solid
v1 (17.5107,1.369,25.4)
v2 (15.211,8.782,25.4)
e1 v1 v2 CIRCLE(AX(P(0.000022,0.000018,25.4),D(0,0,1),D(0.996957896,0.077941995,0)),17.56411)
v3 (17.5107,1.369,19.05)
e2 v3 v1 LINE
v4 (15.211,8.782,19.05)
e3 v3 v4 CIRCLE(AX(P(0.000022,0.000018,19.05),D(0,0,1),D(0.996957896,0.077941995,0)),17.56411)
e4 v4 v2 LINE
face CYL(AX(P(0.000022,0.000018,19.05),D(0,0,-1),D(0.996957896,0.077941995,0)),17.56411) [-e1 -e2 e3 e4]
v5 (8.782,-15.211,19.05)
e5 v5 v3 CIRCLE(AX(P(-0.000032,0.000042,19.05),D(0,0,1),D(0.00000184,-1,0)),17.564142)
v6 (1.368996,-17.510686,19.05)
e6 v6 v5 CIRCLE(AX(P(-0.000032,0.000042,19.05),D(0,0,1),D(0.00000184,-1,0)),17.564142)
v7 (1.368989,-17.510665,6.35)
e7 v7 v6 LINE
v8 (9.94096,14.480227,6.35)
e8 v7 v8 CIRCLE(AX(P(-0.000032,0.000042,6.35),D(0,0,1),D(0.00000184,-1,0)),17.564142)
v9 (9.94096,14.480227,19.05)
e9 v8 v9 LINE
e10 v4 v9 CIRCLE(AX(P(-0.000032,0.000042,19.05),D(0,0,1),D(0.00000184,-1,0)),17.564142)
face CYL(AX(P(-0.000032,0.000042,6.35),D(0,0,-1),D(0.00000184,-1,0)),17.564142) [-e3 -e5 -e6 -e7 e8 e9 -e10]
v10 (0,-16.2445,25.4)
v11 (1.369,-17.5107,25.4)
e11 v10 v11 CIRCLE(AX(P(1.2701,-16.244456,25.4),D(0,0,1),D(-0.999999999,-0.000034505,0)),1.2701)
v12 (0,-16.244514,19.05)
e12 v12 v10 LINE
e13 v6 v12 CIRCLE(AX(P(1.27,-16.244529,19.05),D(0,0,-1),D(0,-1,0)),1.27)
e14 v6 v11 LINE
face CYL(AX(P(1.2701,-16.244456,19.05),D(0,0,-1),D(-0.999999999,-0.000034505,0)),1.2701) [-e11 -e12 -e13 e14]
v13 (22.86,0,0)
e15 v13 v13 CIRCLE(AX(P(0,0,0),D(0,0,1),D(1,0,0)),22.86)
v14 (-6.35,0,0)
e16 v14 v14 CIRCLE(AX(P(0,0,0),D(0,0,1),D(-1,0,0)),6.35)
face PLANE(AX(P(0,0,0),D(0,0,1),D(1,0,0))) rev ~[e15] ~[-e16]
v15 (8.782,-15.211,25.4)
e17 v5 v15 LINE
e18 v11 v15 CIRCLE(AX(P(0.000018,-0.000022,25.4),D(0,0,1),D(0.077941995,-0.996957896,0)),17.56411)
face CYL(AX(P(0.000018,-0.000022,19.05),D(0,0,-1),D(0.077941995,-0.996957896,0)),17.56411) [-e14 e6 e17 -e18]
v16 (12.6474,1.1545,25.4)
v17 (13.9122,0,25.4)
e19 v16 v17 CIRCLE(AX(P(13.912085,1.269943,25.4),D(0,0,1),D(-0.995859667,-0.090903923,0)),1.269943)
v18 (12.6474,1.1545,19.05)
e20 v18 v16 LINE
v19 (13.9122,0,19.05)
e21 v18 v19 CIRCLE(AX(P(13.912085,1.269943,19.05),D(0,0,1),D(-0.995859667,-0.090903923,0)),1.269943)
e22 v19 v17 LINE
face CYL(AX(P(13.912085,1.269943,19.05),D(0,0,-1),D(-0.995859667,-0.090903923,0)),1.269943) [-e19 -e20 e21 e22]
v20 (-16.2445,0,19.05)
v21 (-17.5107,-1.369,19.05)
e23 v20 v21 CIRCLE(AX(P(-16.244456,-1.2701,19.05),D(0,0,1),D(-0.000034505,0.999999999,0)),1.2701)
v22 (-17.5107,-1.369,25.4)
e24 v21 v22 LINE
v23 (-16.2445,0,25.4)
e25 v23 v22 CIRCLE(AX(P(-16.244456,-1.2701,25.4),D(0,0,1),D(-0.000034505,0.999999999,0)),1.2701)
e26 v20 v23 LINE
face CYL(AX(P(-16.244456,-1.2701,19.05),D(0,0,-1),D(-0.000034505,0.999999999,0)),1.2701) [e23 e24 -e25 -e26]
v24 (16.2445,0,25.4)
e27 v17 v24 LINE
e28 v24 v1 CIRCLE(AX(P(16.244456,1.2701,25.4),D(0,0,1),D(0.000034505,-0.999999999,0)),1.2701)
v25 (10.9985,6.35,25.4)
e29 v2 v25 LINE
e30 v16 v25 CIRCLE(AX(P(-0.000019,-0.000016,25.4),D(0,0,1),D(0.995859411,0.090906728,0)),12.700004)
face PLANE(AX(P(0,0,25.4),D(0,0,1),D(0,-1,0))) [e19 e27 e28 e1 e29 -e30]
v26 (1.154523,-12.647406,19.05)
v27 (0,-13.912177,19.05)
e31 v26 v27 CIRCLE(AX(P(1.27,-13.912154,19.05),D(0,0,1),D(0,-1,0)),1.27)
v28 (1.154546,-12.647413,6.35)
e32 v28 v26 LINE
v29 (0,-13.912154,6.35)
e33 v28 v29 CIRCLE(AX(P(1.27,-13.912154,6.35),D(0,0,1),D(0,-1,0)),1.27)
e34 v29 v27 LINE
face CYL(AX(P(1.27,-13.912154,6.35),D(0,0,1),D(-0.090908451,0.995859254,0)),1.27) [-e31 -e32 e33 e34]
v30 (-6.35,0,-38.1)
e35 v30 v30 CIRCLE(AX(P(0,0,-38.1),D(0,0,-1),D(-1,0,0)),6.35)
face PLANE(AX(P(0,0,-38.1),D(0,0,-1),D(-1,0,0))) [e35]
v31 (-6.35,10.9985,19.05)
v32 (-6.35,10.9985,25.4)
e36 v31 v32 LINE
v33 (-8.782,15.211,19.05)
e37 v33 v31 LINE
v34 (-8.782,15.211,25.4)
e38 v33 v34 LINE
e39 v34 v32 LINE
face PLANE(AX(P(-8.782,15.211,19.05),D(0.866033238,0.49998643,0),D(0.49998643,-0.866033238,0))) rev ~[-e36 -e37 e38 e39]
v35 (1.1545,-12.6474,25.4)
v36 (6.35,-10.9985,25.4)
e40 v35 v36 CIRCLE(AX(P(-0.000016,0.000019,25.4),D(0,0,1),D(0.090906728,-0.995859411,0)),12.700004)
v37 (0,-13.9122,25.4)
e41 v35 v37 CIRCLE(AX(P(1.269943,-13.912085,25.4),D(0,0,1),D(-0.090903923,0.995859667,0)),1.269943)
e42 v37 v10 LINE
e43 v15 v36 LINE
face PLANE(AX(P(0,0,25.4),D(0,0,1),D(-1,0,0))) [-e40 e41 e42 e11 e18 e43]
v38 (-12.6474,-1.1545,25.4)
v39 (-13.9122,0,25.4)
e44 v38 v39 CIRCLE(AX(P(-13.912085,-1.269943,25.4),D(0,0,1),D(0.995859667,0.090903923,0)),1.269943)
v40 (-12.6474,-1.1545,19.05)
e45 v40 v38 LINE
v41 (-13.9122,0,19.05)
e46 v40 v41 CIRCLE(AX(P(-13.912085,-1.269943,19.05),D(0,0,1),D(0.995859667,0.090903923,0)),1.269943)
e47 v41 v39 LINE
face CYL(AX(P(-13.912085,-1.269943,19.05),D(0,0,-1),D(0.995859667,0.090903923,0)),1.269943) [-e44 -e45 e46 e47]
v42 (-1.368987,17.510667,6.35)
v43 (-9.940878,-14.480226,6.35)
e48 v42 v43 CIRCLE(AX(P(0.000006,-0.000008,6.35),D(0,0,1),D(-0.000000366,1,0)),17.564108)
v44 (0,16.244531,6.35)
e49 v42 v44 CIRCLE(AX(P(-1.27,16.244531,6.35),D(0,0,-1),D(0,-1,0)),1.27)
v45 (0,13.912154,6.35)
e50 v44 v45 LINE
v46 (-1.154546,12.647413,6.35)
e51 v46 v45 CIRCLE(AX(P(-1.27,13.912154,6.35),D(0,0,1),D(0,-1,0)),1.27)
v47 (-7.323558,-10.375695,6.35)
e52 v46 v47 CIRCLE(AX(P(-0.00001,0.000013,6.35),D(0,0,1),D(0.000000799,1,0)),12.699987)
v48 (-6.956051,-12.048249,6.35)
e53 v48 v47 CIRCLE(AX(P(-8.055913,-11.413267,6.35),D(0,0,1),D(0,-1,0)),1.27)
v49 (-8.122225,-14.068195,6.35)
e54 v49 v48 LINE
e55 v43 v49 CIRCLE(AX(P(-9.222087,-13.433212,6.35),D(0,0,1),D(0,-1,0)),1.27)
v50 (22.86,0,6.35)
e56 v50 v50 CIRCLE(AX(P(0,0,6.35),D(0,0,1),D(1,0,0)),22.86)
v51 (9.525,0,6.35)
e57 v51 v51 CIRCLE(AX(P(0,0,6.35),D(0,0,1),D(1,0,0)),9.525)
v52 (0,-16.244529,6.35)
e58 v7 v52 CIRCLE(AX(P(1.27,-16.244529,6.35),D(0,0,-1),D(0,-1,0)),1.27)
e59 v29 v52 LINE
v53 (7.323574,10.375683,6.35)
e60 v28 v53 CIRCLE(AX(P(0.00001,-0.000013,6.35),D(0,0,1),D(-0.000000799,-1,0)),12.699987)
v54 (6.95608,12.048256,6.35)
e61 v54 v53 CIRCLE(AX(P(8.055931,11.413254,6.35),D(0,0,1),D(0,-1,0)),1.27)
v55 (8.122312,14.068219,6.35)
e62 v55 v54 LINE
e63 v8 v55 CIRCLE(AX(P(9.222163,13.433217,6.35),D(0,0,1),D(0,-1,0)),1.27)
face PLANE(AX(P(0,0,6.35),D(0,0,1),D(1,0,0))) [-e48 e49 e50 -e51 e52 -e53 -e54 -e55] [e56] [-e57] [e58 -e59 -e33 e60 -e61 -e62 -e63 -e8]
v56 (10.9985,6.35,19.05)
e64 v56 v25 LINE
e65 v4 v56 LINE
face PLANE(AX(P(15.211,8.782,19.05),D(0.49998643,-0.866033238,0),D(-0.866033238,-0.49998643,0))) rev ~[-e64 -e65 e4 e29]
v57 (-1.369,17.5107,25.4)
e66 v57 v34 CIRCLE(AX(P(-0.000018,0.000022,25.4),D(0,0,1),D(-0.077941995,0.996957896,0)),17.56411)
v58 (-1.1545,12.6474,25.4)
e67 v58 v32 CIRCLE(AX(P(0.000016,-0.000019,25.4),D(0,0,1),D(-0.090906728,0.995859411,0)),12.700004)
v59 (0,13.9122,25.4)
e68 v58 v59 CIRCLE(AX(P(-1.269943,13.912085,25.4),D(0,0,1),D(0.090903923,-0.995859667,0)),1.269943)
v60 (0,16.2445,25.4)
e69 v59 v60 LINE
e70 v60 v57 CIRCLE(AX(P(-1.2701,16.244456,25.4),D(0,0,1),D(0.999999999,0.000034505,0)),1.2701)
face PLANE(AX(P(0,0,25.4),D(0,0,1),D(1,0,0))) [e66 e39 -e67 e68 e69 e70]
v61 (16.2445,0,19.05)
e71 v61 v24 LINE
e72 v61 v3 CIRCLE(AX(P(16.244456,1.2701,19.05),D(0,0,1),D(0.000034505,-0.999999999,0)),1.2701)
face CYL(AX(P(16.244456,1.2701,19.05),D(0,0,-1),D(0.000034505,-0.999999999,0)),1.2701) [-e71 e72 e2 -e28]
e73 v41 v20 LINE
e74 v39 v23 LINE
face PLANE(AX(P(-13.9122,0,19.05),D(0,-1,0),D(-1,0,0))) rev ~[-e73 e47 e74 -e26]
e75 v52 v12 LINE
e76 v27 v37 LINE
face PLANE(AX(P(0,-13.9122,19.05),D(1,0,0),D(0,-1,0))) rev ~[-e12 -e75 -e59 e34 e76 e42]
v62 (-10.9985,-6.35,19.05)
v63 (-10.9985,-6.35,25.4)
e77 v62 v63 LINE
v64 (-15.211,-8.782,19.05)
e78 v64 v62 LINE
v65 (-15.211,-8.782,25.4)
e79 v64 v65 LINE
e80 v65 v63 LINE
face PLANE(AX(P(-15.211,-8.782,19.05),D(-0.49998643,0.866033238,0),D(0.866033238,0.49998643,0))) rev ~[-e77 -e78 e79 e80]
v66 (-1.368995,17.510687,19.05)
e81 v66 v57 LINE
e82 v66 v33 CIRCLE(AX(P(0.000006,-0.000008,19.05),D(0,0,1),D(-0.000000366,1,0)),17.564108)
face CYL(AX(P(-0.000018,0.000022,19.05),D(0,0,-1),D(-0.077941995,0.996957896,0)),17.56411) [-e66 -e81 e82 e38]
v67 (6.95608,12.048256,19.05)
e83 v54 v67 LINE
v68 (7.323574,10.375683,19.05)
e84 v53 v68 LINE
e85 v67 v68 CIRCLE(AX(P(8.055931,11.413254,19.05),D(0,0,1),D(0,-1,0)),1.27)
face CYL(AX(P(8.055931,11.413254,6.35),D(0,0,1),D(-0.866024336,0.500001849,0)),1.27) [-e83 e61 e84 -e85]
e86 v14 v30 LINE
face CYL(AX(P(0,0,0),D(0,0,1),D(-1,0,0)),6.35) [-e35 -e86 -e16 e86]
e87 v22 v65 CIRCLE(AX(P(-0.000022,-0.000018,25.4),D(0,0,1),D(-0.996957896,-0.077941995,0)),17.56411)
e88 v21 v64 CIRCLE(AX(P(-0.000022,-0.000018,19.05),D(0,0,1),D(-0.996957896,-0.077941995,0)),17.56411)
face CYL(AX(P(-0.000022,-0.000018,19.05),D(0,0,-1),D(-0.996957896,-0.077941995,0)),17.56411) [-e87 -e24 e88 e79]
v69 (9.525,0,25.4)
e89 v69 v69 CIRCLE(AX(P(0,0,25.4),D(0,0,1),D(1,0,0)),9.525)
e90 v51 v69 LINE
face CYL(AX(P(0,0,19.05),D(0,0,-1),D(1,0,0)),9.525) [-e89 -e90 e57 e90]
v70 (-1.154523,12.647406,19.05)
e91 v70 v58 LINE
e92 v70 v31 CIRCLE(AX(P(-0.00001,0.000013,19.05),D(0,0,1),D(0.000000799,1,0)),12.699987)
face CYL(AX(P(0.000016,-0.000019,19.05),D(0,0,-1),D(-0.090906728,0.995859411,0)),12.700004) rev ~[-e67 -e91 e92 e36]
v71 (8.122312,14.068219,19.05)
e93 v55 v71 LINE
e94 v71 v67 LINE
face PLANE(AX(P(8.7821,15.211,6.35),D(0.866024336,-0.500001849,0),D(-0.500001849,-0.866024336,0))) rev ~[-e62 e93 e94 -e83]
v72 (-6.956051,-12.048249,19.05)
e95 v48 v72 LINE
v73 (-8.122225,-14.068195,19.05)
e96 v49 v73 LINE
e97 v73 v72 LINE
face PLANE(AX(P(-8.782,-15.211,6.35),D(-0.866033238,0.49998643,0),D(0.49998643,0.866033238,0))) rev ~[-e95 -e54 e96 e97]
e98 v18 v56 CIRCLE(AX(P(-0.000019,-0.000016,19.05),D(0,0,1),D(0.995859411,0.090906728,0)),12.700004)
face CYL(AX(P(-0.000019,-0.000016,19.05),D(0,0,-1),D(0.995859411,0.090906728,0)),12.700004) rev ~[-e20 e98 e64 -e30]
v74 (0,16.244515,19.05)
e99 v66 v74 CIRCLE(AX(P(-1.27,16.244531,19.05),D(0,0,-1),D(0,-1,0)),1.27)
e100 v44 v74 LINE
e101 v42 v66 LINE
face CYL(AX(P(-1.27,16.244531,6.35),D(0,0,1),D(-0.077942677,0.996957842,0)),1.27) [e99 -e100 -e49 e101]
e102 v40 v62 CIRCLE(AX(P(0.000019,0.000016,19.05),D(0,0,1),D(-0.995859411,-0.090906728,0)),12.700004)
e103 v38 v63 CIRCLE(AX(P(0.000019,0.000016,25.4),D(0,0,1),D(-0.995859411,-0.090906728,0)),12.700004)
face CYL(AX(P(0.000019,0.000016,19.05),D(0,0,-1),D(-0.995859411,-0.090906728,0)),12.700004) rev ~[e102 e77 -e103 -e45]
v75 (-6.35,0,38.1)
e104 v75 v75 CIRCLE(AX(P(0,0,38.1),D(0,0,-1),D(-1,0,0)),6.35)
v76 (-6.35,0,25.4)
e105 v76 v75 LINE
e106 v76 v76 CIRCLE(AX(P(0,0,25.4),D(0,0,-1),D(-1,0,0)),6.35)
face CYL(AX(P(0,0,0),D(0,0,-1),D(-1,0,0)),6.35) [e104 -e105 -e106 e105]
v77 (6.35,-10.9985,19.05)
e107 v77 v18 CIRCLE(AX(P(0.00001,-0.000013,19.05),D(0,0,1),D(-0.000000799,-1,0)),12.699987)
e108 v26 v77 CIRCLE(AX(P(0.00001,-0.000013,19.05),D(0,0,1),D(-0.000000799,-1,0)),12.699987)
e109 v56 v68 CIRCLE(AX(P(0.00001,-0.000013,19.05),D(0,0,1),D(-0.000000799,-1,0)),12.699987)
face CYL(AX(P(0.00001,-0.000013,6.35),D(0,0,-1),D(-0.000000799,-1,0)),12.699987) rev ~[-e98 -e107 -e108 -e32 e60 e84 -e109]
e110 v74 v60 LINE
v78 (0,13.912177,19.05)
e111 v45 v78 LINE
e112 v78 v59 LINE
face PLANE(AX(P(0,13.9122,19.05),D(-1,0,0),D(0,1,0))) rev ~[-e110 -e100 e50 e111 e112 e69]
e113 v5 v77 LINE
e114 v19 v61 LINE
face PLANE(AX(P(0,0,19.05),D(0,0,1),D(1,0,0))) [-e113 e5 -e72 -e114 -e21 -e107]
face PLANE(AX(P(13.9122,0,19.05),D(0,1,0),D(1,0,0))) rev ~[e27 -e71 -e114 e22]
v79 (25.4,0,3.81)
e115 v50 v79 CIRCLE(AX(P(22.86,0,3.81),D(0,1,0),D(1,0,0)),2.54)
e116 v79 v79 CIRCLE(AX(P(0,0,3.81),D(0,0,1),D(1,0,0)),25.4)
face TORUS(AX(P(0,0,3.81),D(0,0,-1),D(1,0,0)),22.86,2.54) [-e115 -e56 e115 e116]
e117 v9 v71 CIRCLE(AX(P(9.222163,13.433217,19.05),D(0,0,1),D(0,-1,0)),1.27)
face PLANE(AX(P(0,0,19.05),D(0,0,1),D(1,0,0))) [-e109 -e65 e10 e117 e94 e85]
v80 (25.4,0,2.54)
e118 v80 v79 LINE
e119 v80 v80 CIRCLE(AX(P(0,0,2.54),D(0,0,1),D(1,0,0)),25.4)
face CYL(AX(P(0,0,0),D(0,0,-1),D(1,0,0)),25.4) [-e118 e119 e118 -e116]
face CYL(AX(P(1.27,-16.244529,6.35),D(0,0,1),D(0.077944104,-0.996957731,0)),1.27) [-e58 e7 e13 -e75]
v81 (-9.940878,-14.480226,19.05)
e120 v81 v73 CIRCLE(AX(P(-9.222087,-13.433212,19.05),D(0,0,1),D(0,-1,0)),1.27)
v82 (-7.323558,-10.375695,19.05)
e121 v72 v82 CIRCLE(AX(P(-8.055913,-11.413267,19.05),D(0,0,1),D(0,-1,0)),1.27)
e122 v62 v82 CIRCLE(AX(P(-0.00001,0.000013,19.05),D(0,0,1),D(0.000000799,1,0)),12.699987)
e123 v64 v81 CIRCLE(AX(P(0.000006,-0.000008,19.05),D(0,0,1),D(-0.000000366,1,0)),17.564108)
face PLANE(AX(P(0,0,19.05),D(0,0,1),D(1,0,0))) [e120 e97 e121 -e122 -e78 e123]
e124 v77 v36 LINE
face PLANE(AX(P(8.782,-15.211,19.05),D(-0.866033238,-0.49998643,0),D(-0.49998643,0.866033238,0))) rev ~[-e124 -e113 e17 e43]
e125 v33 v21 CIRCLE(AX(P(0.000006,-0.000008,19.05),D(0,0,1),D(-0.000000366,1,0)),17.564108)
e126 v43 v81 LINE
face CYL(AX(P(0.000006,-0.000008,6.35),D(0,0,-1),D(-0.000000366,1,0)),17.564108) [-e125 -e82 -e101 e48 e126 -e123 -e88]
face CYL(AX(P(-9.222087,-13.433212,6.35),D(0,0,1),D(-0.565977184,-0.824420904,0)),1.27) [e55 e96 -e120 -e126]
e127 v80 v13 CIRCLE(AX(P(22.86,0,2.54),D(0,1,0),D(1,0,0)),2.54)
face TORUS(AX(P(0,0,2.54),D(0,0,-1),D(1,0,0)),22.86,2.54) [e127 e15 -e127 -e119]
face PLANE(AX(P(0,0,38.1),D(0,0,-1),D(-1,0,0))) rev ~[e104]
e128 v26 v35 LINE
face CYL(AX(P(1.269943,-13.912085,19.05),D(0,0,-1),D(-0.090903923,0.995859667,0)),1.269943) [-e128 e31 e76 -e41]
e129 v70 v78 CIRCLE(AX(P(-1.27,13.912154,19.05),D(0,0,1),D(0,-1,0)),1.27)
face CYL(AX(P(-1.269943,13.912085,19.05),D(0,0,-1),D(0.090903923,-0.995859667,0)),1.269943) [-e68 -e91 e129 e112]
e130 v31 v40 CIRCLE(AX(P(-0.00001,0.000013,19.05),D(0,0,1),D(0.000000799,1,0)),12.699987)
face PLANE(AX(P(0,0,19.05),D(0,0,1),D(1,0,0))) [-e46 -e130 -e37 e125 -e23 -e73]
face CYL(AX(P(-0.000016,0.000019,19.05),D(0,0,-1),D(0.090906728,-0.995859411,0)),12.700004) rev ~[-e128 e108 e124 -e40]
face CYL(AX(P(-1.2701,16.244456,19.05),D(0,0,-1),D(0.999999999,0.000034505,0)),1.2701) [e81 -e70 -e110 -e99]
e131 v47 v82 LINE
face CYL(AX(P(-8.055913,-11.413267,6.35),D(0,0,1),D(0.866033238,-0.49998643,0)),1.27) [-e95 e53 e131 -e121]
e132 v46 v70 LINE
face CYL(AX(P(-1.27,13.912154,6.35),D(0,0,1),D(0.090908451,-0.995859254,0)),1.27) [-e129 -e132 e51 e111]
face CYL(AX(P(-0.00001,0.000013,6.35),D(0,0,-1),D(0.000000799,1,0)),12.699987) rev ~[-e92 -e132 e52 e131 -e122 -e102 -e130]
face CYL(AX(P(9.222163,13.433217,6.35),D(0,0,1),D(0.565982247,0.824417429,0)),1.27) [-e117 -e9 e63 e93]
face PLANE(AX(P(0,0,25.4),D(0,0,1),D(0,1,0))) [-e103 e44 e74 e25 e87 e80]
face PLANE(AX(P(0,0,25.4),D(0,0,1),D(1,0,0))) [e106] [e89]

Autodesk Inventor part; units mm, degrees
ref_plane "YZ Plane" through (0, 0, 0) normal (1, 0, 0) x (0, 1, 0)
ref_plane "XZ Plane" through (0, 0, 0) normal (0, 1, 0) x (-1, 0, 0)
ref_plane "XY Plane" through (0, 0, 0) normal (0, 0, 1) x (1, 0, 0)
sketch "Sketch1" plane through (0, 0, 0) normal (0, 0, 1) x (1, 0, 0)
  circle A0 centre (0, 0) radius 25.4
  circle A1 centre (0, 0) radius 6.35
  dimension "d0" = 50.8
  dimension "d4" = 12.7
extrude "Extrusion1" add sketch "Sketch1" along normal blind 6.35
sketch "Sketch2" plane through (0, 0, 6.35) normal (0, 0, 1) x (1, 0, 0)
  circle A0 centre (0, 0) radius 25.4 construction
  circle A1 centre (0, 0) radius 9.525
  circle A2 centre (0, 0) radius 6.35
  line L0 (0, 0) -> (0, 17.5641) construction
  line L1 (0, 0) -> (0, -17.5641) construction
  line L2 (0, 17.5641) -> (0, 12.7)
  line L3 (0, 0) -> (8.7821, 15.211) construction
  line L4 (8.7821, 15.211) -> (6.35, 10.9985)
  line L5 (0, 0) -> (-8.782, -15.211) construction
  line L6 (0, -12.7) -> (0, -17.5641)
  line L7 (-8.782, -15.211) -> (-6.35, -10.9985)
  arc A3 (0, 12.7) -> (-6.35, -10.9985) centre (0, 0) ccw
  arc A4 (0, -12.7) -> (6.35, 10.9985) centre (0, 0) ccw
  arc A5 (0, 17.5641) -> (-8.782, -15.211) centre (0, 0) ccw
  arc A6 (0, -17.5641) -> (8.7821, 15.211) centre (0, 0) ccw
  dimension "d5" = 19.05
  dimension "d6" = 12.7
  dimension "d8" = 30
  dimension "d9" = 30
  dimension "d10" = 12.7
  dimension "d11" = 17.5641
  dimension "d12" = 17.5641
  dimension "d13" = 12.7
extrude "Extrusion2" add sketch "Sketch2" along normal blind 12.7
fillet "Fillet1" radius 1.27 8 edges at (0, 17.5641, 12.7) (0, 12.7, 12.7) (8.7821, 15.211, 12.7) (6.35, 10.9985, 12.7) (0, -12.7, 12.7) (0, -17.5641, 12.7) (-8.782, -15.211, 12.7) (-6.35, -10.9985, 12.7)
sketch "Sketch3" plane through (0, 0, 19.05) normal (0, 0, 1) x (1, 0, 0)
  circle A0 centre (0, 0) radius 6.35 projected
  circle A1 centre (0, 0) radius 9.525 projected
extrude "Extrusion3" add sketch "Sketch3" along normal blind 6.35
sketch "Sketch4" plane through (0, 0, 19.05) normal (0, 0, 1) x (1, 0, 0)
  arc A0 (-1.1545, 12.6474) -> (-7.3236, -10.3757) centre (0, 0) ccw projected
  line L0 (-8.1223, -14.0682) -> (-6.9561, -12.0483) projected
  arc A1 (-1.369, 17.5107) -> (-9.9409, -14.4802) centre (0, 0) ccw projected
  circle A2 centre (0, 0) radius 25.4 construction
  line L1 (0, 25.4) -> (0, -25.4) construction
  line L2 (0, 0) -> (-8.782, 15.211) construction
  line L3 (0, 0) -> (8.782, -15.211) construction
  arc A3 (-6.9561, -12.0483) -> (-7.3236, -10.3757) centre (-8.0559, -11.4133) ccw projected
  arc A4 (-1.1545, 12.6474) -> (-7.3236, -10.3757) centre (0, 0) ccw projected
  arc A5 (-1.1545, 12.6474) -> (0, 13.9122) centre (-1.27, 13.9122) ccw projected
  line L4 (0, 13.9122) -> (0, 16.2445) projected
  arc A6 (0, 16.2445) -> (-1.369, 17.5107) centre (-1.27, 16.2445) ccw projected
  arc A7 (-1.369, 17.5107) -> (-9.9409, -14.4802) centre (0, 0) ccw projected
  arc A8 (-9.9409, -14.4802) -> (-8.1223, -14.0682) centre (-9.2221, -13.4332) ccw projected
  line L5 (-8.1223, -14.0682) -> (-6.9561, -12.0483) projected
  line L6 (-8.782, 15.211) -> (-6.35, 10.9985)
  arc A9 (0, -16.2445) -> (1.369, -17.5107) centre (1.27, -16.2445) ccw projected
  arc A10 (1.369, -17.5107) -> (9.9409, 14.4802) centre (0, 0) ccw projected
  arc A11 (9.9409, 14.4802) -> (8.1223, 14.0682) centre (9.2221, 13.4332) ccw projected
  line L7 (8.1223, 14.0682) -> (6.9561, 12.0483) projected
  arc A12 (6.9561, 12.0483) -> (7.3236, 10.3757) centre (8.0559, 11.4133) ccw projected
  arc A13 (1.1545, -12.6474) -> (7.3236, 10.3757) centre (0, 0) ccw projected
  arc A14 (1.1545, -12.6474) -> (0, -13.9122) centre (1.27, -13.9122) ccw projected
  line L8 (0, -13.9122) -> (0, -16.2445) projected
  line L9 (6.35, -10.9985) -> (8.782, -15.211)
  arc A15 (-1.369, 17.5107) -> (-8.782, 15.211) centre (0, 0) ccw
  arc A16 (-1.1545, 12.6474) -> (-6.35, 10.9985) centre (0, 0) ccw
  arc A17 (-1.1545, 12.6474) -> (0, 13.9122) centre (-1.27, 13.9122) ccw
  arc A18 (0, 16.2445) -> (-1.369, 17.5107) centre (-1.27, 16.2445) ccw
  line L10 (0, 16.2445) -> (0, 13.9122)
  dimension "d19" = 30
  dimension "d20" = 12.7
extrude "Extrusion4" add sketch "Sketch4" along normal blind 6.35 contours A0 L6 A1 A6 L4 A5
pattern_circular "Circular Pattern1" count 4 over 360 about axis through (0, 0, 0) along (0, 0, 1) of "Extrusion4"
sketch "Sketch5" plane through (0, 0, 0) normal (0, 0, -1) x (-1, 0, 0)
  circle A0 centre (0, 0) radius 6.35
  circle A1 centre (0, 0) radius 6.35 projected
extrude "Extrusion5" add sketch "Sketch5" along normal blind 38.1 and the other way blind 38.1
fillet "Fillet2" radius 2.54 2 edges at (-25.4, 0, 6.35) (-25.4, 0, 0)
equation "\"d12\" = d11"
equation "\"d13\" = d10"
properties part number "Spool Main Section Mk1"
